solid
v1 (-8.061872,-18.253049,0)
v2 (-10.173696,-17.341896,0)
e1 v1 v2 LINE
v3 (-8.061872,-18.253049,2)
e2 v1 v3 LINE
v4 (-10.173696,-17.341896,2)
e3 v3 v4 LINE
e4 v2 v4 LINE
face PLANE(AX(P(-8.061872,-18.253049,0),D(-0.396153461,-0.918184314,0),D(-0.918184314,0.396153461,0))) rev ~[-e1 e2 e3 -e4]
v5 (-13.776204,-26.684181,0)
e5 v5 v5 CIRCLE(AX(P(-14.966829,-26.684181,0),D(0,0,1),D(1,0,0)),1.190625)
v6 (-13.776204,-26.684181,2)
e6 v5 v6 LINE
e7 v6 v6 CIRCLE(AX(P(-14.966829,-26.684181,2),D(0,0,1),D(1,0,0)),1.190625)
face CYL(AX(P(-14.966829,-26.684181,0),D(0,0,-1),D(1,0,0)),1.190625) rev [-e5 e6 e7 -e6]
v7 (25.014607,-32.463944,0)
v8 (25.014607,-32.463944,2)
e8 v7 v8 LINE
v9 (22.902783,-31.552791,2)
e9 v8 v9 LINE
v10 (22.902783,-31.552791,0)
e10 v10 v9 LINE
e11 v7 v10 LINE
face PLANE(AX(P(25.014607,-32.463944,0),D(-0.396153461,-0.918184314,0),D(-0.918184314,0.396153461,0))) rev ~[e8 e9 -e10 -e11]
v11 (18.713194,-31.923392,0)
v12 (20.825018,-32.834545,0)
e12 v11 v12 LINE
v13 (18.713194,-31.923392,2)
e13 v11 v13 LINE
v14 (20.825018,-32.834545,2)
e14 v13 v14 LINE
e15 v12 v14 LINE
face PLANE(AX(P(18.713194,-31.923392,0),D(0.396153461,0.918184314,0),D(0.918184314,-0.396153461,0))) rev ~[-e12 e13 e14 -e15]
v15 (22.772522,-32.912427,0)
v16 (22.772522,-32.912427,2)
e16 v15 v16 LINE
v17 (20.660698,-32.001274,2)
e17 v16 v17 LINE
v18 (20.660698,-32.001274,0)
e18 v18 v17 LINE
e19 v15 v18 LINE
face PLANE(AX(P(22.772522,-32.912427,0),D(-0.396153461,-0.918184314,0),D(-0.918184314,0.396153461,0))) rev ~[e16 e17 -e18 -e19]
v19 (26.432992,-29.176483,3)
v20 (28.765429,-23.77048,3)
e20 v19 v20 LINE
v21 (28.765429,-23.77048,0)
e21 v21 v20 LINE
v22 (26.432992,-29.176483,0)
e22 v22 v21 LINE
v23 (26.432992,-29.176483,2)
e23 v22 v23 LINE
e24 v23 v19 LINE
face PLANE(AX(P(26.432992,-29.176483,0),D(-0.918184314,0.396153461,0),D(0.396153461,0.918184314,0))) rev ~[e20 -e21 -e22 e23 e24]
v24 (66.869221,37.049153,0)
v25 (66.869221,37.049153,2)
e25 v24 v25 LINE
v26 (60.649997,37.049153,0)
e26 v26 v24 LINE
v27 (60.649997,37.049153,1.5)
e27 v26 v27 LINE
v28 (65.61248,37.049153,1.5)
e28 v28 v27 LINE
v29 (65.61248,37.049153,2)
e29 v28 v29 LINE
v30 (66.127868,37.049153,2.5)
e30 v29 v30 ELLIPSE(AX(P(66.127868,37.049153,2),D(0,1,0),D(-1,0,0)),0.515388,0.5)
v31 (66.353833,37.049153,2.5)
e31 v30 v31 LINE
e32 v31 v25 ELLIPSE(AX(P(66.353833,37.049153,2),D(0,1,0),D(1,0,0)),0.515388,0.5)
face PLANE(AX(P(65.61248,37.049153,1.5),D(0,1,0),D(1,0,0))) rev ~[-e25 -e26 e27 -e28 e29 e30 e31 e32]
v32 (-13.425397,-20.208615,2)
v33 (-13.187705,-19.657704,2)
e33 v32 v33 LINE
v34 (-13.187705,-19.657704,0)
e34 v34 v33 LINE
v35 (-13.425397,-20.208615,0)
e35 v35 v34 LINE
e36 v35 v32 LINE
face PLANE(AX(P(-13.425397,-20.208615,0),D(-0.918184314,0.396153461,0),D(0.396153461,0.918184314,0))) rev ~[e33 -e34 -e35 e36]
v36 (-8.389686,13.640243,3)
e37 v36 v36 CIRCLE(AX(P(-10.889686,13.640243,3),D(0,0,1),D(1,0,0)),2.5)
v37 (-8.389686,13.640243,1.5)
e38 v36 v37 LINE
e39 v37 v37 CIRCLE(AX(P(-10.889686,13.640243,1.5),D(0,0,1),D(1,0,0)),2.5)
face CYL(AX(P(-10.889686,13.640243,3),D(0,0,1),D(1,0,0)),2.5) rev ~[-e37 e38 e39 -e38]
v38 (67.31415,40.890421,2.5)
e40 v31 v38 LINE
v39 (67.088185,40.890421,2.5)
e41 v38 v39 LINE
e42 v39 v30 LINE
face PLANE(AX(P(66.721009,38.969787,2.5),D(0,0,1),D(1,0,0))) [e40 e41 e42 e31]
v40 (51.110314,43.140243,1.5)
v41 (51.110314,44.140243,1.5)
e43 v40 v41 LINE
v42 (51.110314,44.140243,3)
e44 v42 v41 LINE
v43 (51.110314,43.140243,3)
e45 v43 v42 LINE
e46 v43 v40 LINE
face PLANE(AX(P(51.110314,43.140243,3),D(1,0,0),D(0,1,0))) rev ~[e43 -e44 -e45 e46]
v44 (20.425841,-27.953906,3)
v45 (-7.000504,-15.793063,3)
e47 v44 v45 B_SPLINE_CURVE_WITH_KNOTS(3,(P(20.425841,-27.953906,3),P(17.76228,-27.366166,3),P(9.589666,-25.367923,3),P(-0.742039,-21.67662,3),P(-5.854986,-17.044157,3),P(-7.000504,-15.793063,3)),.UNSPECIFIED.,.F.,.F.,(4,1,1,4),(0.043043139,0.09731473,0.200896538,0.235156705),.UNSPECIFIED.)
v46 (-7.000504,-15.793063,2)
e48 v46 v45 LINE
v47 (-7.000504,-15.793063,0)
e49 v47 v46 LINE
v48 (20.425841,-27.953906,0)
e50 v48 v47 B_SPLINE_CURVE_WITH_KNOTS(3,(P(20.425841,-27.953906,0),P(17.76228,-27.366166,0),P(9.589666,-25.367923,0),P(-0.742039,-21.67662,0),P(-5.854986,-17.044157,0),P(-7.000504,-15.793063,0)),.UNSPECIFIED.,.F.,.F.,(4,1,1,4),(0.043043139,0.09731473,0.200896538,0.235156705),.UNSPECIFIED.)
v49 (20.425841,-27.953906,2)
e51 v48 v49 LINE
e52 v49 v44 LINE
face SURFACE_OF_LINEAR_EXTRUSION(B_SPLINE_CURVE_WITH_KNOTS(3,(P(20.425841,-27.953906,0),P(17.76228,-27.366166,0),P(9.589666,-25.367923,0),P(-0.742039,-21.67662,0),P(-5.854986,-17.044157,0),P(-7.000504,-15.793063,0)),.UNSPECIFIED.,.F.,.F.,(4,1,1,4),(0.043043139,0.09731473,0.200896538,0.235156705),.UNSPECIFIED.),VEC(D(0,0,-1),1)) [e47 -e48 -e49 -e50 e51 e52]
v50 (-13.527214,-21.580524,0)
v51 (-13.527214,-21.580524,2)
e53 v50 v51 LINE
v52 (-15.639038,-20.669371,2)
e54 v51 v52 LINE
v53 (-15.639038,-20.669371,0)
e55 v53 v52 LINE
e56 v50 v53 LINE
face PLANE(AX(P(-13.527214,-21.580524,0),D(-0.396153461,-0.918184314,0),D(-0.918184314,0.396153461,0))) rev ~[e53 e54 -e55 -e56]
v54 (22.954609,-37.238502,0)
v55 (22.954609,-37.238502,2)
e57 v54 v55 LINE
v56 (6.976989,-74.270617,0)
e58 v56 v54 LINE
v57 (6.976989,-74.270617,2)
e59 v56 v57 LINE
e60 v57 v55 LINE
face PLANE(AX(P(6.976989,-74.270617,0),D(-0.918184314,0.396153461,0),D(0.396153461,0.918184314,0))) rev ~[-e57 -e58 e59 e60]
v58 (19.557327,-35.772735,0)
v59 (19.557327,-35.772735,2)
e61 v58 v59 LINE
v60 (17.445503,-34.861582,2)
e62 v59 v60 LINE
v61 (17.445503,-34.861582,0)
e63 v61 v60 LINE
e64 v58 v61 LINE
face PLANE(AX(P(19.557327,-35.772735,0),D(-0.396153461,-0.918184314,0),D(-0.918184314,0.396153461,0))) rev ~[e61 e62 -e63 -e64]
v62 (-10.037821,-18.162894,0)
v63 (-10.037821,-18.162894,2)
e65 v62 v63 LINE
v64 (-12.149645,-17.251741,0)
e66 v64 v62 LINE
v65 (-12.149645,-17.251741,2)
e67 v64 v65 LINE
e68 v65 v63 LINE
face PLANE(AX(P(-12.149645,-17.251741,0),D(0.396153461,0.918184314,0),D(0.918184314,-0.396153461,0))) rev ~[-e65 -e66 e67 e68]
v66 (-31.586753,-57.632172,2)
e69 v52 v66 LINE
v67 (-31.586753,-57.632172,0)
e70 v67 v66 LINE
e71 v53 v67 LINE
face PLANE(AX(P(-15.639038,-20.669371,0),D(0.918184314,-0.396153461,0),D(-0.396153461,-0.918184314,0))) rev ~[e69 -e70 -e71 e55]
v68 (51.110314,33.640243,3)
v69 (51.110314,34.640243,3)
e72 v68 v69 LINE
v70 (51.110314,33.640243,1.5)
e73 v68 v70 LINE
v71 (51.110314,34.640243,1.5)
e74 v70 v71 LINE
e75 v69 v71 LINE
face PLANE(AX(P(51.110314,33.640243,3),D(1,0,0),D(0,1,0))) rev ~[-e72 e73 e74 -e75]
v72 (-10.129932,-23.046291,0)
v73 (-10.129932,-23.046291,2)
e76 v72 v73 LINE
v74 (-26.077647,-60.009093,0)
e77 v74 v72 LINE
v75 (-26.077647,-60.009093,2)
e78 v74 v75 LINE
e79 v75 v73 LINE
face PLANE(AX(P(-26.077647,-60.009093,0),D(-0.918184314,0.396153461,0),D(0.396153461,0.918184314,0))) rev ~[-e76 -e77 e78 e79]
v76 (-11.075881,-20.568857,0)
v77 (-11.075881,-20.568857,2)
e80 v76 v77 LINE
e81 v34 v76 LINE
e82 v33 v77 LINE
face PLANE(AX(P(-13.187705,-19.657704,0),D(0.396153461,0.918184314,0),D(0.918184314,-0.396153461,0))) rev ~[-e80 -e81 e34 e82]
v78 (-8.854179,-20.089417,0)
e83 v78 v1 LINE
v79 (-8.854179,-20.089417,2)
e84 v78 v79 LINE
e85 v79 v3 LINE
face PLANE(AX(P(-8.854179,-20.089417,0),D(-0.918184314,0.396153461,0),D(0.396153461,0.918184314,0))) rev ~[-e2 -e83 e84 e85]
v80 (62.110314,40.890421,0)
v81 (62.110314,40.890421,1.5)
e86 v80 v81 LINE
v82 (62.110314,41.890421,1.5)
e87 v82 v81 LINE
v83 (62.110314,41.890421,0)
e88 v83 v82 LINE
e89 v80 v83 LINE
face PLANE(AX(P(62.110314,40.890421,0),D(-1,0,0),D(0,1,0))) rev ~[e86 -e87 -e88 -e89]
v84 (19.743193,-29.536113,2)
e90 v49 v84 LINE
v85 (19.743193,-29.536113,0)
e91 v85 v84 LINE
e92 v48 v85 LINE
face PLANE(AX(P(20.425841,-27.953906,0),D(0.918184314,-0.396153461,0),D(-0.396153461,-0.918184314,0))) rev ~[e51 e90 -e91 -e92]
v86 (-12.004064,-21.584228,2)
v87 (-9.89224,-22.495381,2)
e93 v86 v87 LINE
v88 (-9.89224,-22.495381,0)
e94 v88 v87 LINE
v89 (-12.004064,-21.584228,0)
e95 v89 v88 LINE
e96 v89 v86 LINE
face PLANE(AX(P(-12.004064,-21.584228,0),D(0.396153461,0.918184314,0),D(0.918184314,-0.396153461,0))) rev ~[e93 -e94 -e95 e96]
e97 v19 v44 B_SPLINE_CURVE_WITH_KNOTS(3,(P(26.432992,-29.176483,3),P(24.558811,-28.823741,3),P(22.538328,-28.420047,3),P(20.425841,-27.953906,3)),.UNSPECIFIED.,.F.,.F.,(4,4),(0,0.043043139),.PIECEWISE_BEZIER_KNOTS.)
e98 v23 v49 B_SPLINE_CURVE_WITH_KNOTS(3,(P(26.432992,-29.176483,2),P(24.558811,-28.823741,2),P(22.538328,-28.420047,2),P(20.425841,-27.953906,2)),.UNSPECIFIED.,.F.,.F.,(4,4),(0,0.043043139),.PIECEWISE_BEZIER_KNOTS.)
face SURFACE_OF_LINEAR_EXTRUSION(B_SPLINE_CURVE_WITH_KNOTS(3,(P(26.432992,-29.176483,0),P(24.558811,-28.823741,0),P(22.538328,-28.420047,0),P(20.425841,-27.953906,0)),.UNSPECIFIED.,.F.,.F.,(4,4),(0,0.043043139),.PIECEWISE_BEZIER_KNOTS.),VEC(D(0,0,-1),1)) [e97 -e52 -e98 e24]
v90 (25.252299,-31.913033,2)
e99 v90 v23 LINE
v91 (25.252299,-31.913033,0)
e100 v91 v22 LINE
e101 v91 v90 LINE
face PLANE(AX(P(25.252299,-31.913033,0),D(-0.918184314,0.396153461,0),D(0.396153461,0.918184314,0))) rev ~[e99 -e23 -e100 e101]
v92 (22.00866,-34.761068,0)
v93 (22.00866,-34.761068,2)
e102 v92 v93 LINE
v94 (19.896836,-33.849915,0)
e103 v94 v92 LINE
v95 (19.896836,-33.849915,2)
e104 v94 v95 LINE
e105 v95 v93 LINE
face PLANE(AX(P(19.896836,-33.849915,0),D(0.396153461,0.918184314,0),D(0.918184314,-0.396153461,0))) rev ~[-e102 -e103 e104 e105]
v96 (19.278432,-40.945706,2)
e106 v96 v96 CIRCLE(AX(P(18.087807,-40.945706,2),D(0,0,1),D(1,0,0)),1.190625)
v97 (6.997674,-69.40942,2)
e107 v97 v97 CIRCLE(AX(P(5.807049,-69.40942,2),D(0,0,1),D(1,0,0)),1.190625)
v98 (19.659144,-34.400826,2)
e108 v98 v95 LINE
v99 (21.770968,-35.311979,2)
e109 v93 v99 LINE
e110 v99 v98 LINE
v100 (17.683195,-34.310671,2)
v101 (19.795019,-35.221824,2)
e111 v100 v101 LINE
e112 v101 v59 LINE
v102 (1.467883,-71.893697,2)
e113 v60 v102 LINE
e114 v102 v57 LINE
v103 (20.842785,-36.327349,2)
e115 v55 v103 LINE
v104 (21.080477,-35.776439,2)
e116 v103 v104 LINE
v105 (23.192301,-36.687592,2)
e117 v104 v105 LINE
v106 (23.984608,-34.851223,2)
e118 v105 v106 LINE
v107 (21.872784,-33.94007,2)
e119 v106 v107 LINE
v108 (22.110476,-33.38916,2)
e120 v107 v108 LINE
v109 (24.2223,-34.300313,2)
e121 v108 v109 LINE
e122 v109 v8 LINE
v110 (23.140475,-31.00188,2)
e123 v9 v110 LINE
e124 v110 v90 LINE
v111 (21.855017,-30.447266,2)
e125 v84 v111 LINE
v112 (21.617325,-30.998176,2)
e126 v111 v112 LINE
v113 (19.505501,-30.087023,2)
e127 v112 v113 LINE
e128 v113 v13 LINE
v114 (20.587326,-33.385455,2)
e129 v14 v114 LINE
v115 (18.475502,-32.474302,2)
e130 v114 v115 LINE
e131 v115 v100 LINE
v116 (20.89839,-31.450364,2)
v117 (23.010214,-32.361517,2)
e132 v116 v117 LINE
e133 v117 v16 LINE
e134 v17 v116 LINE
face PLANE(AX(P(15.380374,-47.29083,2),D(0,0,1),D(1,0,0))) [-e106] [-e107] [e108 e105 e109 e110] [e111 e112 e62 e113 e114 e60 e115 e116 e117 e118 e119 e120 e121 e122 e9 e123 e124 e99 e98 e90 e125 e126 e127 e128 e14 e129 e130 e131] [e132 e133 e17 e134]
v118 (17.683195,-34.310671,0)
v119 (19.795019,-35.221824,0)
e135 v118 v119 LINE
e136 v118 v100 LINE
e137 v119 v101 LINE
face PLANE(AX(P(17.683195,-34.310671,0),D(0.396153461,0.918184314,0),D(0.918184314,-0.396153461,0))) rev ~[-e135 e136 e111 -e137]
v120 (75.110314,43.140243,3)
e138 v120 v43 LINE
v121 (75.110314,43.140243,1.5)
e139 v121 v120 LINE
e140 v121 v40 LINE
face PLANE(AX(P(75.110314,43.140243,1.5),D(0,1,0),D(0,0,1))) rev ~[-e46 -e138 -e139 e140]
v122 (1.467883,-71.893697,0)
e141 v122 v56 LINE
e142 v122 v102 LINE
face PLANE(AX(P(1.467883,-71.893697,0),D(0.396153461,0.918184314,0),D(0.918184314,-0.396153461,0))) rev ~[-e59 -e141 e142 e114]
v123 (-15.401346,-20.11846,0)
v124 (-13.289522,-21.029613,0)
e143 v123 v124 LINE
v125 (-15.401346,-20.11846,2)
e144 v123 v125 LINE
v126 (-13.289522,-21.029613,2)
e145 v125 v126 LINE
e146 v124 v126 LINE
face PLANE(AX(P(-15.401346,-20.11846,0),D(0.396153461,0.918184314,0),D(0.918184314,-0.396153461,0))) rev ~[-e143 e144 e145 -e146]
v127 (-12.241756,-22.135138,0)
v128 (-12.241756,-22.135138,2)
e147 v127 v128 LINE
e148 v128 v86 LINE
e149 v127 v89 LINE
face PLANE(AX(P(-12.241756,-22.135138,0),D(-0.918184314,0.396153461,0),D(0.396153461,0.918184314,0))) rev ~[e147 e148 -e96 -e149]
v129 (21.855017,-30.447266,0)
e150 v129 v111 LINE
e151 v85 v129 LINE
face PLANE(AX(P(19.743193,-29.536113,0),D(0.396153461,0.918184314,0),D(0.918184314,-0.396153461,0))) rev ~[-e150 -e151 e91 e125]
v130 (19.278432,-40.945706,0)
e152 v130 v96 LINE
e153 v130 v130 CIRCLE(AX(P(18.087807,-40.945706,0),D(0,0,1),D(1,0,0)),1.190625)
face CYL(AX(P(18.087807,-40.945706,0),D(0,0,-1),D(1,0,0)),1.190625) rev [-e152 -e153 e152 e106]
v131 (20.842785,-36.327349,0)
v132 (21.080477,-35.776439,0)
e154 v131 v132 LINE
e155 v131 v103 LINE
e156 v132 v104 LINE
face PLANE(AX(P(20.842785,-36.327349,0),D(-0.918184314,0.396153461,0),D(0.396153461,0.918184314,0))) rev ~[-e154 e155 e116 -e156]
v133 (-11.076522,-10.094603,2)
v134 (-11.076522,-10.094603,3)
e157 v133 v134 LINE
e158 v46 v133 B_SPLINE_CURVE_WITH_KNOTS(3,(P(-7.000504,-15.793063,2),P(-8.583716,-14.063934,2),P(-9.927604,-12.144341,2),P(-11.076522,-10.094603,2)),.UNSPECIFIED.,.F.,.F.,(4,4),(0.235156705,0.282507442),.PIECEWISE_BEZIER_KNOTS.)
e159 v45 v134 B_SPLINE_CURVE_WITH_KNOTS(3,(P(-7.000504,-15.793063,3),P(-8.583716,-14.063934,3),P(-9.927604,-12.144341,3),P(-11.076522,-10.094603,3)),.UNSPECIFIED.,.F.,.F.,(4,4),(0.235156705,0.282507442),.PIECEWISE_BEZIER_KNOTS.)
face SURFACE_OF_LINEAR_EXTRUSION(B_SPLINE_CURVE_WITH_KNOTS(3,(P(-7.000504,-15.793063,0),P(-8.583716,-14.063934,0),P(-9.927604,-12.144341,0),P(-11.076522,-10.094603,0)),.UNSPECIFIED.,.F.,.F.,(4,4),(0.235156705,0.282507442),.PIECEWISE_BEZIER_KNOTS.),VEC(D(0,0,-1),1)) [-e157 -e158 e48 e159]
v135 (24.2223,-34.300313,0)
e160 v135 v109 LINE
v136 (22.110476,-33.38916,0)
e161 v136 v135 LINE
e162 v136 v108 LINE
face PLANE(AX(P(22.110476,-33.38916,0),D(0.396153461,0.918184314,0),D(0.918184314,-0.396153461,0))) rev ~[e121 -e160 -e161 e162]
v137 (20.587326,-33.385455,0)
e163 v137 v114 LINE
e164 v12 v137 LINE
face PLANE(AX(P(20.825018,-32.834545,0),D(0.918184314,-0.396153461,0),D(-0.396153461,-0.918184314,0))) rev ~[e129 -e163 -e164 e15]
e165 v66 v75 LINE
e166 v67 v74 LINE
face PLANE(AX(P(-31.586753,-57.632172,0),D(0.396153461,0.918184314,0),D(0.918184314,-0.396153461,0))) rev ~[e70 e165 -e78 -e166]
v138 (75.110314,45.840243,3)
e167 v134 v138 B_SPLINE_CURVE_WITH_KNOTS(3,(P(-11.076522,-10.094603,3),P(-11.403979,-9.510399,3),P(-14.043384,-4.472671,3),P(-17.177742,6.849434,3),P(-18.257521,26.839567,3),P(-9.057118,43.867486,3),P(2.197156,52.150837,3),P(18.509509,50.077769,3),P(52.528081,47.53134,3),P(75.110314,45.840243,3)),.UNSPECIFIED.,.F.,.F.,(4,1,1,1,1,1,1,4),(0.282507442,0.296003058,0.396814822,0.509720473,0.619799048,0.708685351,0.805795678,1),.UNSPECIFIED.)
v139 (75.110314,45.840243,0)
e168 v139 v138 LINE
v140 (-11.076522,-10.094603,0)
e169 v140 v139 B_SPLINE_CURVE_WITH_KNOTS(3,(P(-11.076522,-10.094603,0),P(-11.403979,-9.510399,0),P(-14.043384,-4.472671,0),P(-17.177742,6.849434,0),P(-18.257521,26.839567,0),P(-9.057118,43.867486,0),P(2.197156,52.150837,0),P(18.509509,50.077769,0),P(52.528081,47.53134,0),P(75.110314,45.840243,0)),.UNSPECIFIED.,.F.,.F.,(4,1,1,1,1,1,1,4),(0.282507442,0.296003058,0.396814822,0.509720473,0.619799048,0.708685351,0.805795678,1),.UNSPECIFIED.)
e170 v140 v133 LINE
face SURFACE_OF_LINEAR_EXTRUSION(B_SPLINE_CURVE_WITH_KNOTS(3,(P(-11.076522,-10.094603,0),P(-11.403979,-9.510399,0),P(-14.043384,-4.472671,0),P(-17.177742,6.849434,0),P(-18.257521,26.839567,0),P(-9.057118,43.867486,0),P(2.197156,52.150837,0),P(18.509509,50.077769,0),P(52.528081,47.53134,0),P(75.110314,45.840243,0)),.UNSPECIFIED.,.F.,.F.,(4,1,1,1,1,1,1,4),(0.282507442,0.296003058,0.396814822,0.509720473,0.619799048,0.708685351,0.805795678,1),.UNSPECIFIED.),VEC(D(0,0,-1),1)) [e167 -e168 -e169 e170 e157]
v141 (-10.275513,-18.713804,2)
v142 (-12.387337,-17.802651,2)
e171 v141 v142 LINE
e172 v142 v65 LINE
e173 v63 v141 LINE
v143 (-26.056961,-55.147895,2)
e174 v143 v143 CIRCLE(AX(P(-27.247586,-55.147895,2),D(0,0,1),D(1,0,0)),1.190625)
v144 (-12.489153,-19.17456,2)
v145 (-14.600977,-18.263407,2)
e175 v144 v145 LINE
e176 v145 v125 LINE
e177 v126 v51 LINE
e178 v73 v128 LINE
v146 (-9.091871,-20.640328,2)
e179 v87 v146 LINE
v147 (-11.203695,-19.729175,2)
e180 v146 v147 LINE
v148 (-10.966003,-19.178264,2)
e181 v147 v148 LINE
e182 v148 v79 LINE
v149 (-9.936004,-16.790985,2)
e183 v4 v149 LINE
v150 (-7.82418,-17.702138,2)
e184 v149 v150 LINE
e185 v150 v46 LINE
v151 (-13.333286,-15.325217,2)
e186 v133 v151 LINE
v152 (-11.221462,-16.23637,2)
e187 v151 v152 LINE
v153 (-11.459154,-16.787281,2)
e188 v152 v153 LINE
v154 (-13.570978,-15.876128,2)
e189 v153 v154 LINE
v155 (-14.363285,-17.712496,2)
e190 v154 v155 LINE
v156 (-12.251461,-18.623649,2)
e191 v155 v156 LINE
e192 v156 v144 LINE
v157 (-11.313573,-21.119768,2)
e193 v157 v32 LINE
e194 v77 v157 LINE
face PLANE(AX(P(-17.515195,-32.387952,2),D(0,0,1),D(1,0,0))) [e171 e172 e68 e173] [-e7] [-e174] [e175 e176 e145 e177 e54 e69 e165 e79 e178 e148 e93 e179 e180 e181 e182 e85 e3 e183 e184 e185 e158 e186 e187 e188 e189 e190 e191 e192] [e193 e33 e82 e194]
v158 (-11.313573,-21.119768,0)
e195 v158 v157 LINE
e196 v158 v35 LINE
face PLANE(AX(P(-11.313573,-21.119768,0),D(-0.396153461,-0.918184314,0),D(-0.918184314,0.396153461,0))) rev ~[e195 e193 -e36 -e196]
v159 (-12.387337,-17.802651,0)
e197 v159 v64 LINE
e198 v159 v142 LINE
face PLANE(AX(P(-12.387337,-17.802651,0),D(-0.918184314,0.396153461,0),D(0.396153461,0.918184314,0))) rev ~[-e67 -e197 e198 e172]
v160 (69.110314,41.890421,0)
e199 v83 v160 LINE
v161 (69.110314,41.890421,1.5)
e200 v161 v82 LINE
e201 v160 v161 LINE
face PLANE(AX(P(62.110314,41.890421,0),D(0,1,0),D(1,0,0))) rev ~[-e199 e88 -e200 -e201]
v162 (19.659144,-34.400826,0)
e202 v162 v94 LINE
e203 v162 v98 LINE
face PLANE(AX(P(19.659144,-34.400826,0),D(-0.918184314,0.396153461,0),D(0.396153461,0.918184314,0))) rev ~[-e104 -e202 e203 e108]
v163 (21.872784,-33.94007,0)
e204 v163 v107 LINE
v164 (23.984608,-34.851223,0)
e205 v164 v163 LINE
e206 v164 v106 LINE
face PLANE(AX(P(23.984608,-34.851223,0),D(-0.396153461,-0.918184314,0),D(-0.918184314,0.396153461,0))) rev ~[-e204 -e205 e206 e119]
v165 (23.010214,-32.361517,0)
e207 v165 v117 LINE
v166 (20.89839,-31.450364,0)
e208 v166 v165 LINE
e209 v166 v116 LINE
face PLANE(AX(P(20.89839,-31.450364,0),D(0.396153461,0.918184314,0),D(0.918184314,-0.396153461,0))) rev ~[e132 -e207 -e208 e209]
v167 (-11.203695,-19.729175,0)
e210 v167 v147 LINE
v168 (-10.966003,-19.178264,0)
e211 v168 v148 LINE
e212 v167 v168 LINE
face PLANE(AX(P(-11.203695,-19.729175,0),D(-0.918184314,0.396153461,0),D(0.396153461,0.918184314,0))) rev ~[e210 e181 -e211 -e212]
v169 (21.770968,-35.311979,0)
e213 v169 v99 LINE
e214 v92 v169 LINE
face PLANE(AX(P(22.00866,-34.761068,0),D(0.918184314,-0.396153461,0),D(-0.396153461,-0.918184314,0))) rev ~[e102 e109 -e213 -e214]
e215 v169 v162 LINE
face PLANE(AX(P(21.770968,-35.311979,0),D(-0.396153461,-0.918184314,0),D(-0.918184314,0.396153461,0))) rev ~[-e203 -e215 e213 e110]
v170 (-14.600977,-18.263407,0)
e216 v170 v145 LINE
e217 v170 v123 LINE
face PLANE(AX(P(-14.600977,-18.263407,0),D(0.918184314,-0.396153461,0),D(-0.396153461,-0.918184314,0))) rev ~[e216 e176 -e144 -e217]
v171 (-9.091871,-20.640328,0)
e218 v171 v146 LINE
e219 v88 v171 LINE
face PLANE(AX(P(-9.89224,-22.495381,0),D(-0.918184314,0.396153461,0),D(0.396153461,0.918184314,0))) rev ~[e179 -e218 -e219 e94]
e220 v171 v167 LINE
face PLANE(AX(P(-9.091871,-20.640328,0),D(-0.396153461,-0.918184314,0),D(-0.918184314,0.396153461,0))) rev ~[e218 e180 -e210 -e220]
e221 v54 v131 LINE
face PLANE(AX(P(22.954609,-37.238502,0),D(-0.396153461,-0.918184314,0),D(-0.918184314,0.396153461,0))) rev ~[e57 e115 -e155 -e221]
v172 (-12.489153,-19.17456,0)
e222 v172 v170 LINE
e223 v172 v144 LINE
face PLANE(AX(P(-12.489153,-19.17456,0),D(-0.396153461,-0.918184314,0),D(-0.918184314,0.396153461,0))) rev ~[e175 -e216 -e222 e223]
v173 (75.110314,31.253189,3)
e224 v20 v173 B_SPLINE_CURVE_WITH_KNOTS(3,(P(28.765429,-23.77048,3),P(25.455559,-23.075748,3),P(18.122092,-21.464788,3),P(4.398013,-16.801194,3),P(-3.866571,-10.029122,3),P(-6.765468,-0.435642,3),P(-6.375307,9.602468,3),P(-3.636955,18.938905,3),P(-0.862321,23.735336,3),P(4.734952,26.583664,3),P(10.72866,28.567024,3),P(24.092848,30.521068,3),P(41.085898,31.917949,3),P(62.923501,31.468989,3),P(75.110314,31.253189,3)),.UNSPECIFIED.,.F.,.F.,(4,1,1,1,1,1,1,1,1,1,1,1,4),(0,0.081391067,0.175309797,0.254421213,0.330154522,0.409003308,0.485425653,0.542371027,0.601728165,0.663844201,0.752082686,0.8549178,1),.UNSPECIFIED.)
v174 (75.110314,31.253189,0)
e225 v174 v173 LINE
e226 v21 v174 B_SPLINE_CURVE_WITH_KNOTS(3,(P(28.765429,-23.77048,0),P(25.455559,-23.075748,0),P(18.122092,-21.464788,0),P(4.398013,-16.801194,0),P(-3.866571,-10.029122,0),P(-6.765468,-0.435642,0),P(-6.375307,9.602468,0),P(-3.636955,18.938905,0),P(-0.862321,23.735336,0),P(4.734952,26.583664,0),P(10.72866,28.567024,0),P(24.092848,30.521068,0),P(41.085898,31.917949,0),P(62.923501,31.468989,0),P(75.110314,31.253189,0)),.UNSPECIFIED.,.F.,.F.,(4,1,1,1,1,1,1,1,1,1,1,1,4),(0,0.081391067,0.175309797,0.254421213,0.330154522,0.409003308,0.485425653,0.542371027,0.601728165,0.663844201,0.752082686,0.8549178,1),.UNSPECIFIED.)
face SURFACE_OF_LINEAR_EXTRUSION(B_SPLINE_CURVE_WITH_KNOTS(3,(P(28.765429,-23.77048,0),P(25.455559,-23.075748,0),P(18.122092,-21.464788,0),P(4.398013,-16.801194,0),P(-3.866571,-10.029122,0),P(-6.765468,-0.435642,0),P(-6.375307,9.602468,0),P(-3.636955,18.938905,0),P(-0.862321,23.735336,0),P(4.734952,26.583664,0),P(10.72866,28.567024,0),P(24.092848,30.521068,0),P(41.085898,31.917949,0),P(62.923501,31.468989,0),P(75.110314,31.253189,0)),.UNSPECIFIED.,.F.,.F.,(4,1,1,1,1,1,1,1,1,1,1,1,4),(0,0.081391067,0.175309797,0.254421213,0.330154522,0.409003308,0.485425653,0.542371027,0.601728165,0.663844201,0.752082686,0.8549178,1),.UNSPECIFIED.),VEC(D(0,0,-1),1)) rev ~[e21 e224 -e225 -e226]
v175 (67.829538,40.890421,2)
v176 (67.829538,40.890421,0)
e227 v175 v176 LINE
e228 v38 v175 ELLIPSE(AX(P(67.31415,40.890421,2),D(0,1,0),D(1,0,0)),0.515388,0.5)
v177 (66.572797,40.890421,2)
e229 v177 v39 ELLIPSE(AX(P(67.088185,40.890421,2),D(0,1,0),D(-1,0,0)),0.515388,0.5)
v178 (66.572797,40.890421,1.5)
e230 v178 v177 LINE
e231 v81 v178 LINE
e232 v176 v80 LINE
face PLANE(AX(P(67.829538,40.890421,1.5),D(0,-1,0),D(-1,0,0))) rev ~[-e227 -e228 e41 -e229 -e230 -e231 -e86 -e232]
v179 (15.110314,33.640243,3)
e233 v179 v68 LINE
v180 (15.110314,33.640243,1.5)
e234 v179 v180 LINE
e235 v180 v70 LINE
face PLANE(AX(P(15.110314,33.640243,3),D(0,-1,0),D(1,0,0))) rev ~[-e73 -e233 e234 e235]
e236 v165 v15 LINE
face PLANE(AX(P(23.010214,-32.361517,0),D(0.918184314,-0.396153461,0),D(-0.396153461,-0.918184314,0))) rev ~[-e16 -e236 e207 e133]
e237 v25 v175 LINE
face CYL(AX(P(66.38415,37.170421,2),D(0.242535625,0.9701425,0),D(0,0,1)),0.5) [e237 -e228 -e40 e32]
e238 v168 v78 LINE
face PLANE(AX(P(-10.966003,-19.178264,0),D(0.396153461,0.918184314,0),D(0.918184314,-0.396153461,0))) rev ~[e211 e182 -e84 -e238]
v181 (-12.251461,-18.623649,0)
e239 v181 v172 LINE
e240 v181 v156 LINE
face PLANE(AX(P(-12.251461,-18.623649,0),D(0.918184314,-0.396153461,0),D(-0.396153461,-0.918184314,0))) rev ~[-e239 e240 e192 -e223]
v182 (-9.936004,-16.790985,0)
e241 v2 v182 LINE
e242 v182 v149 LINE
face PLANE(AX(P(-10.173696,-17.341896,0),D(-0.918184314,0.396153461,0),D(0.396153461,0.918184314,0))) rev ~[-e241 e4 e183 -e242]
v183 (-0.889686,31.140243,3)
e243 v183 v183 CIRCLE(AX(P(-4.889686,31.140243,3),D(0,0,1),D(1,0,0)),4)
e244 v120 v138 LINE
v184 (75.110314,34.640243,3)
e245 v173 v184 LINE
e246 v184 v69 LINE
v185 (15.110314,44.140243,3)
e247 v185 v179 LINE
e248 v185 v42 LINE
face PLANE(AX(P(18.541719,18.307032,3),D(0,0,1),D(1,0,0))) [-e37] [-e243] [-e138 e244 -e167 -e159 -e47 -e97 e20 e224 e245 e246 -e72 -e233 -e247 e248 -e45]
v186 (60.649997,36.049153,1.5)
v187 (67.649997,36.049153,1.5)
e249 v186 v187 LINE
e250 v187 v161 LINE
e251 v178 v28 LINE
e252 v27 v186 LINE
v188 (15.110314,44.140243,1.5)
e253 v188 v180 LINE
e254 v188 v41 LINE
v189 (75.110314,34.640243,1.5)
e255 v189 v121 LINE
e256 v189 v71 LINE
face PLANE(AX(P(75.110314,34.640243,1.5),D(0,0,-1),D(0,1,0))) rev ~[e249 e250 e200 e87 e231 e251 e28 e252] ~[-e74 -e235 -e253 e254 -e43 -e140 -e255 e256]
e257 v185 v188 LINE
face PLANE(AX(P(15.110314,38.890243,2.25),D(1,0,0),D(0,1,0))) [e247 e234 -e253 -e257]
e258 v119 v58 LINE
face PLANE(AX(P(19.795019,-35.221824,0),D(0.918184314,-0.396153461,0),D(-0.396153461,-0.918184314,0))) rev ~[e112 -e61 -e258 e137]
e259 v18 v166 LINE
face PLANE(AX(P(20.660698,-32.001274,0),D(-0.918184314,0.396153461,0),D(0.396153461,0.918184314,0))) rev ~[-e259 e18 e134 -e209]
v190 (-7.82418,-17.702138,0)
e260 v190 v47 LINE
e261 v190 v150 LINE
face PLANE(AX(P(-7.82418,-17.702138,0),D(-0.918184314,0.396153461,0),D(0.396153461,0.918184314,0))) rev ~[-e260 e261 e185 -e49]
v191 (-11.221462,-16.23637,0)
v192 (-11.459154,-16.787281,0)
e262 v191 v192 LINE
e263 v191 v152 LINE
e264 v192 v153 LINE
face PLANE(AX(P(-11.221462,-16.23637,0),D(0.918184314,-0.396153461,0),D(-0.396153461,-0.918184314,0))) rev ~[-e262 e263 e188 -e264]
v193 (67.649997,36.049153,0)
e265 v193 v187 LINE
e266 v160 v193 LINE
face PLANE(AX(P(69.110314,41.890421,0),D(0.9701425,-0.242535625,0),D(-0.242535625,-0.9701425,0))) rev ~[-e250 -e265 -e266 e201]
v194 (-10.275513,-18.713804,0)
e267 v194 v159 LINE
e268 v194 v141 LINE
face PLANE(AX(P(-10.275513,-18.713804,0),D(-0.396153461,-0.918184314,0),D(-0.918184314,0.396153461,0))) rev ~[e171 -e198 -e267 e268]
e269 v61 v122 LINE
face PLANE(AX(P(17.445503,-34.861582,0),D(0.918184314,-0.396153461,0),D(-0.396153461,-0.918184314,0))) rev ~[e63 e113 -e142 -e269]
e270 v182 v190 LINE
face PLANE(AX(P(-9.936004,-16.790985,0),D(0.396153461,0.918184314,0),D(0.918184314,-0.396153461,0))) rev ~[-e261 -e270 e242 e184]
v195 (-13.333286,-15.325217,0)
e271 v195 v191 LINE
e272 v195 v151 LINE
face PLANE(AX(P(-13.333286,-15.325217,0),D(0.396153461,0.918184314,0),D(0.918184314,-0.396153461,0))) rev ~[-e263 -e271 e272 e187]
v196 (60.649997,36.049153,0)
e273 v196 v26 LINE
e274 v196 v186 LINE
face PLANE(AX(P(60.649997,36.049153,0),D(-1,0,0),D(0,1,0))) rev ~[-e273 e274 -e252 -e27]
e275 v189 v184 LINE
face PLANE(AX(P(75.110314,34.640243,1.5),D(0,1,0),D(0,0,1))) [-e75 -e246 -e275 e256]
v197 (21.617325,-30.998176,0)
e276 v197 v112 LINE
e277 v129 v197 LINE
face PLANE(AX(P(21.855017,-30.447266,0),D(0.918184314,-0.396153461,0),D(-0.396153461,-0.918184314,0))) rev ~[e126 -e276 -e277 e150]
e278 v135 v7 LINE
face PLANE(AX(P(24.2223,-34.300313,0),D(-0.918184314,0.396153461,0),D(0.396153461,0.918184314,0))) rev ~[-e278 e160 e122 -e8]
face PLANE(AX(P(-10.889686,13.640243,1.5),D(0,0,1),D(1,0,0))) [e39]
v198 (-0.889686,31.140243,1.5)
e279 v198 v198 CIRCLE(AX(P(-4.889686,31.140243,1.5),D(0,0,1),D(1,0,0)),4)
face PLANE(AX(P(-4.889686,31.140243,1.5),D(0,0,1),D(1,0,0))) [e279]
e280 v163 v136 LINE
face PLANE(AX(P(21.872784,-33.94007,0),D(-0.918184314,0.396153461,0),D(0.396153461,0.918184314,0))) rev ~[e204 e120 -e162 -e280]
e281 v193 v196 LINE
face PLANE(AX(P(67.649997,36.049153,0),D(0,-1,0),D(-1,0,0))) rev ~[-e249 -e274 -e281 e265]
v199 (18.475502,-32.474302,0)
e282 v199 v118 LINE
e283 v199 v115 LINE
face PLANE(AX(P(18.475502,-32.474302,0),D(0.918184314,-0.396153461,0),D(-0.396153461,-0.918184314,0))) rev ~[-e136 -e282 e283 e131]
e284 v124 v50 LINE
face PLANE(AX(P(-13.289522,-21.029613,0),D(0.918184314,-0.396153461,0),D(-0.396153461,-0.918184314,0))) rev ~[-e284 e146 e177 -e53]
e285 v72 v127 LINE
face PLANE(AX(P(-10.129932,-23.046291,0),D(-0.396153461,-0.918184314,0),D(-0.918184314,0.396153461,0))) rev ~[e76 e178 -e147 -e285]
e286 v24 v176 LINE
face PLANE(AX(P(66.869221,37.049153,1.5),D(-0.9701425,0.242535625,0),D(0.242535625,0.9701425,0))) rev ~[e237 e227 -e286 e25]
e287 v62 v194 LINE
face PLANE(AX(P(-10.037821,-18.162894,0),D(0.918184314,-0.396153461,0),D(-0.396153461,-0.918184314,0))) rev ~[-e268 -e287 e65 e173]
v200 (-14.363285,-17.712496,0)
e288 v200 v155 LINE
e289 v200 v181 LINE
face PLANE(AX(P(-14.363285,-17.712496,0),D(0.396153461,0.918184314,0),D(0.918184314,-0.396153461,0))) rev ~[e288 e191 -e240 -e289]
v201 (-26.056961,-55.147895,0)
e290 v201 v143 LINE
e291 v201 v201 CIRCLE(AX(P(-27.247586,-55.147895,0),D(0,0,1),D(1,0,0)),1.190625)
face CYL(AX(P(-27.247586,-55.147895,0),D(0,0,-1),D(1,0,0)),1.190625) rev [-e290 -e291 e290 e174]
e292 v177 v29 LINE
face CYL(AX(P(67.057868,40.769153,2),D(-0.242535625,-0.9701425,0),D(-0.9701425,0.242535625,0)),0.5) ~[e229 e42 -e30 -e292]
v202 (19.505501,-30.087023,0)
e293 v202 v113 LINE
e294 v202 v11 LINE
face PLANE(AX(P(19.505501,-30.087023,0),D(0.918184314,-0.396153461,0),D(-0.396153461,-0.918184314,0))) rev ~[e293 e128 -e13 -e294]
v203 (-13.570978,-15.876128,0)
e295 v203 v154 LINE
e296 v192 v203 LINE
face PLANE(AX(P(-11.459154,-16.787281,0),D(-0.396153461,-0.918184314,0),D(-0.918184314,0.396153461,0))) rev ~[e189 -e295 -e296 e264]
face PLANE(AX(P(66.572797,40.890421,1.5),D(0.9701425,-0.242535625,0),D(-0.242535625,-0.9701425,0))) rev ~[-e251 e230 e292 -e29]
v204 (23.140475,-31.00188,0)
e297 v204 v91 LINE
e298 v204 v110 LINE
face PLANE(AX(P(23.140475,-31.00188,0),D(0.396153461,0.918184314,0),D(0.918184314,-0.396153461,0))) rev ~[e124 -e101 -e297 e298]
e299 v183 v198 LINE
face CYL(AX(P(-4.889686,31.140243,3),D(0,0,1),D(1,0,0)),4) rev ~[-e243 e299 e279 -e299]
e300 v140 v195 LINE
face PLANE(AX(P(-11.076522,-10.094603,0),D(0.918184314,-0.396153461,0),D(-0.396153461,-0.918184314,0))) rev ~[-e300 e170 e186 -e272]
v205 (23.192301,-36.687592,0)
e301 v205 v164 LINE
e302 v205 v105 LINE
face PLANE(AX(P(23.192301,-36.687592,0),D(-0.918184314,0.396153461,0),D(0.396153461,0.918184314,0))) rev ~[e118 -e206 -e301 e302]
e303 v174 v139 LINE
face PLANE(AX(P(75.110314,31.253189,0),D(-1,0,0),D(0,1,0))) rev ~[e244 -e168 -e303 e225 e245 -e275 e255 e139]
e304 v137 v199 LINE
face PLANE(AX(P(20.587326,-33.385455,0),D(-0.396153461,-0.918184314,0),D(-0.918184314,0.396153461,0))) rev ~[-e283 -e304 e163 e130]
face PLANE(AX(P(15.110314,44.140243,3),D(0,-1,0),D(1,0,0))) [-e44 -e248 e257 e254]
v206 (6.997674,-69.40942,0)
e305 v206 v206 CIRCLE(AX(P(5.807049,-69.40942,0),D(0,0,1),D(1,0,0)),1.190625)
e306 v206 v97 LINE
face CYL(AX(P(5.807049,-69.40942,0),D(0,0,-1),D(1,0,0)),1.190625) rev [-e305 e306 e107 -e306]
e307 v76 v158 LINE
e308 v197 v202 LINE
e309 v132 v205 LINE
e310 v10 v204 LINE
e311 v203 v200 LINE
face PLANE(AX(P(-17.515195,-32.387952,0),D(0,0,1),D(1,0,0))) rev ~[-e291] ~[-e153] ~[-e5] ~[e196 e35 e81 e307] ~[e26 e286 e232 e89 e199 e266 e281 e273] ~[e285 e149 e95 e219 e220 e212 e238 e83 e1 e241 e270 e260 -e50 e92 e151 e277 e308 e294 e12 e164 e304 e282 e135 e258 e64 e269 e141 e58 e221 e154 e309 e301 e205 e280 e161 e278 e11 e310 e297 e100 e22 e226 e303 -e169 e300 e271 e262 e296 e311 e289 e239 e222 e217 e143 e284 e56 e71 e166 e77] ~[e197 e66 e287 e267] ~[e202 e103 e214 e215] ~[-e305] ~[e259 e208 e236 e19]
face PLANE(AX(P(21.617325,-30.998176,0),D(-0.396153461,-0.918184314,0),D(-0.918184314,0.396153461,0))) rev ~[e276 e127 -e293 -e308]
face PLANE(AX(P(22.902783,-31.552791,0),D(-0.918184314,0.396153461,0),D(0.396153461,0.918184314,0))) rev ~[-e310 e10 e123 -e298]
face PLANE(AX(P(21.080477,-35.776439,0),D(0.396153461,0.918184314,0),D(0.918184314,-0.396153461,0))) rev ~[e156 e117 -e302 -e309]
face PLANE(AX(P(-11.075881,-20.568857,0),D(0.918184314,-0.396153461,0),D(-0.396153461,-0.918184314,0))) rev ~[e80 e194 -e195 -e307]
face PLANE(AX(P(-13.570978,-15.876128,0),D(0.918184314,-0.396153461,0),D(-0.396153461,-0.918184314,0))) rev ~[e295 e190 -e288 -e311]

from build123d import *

# Parameters (mm, degrees)
F1_DEPTH = 3
F2_W     = 8.5
F2_H     = 1.5
F3_DEPTH = 60
F0_R     = 1.190625
F4_DEPTH = 2
F6_DEPTH = 1
F7_R     = 0.5
F8_W     = 36
F8_H     = 1
F8_R     = 4
F8_R_2   = 2.5
F9_DEPTH = 1.5


with BuildPart() as f1:
    # F0 (on Top) → F1 (new body)
    with BuildSketch(Plane.XY):
        with BuildLine():
            Line((26.4329920983, -29.1764834751), (28.7654289259, -23.7704801999))
            add(Edge.make_bspline(
                [(28.7654289259, -23.7704801999), (25.4555594803, -23.0757479442), (18.122091552, -21.4647883009), (4.3980129119, -16.8011940655), (-3.8665706509, -10.0291223028), (-6.7654679647, -0.4356418155), (-6.3753072829, 9.6024678508), (-3.6369552871, 18.9389051335), (-0.8623211451, 23.7353358816), (4.7349516236, 26.5836641266), (10.7286597258, 28.5670237026), (24.0928479086, 30.5210675073), (41.0858980443, 31.9179492856), (62.923501486, 31.4689886818), (75.1103142806, 31.2531887853)],
                knots=[0, 0, 0, 0, 0.081391067, 0.1753097966, 0.2544212132, 0.3301545218, 0.4090033083, 0.485425653, 0.5423710265, 0.6017281651, 0.6638442011, 0.7520826863, 0.8549178005, 1, 1, 1, 1], degree=3))
            Line((75.1103142806, 31.2531887853), (75.1103142806, 45.8402432411))
            add(Edge.make_bspline(
                [(-11.0765215286, -10.0946031237), (-11.4039789468, -9.5103994177), (-14.0433837385, -4.4726707186), (-17.1777421826, 6.8494336444), (-18.2575205417, 26.8395665887), (-9.0571179008, 43.867485681), (2.1971560219, 52.1508367912), (18.5095094509, 50.0777693112), (52.5280811409, 47.5313397047), (75.1103142806, 45.8402432411)],
                knots=[0.2825074418, 0.2825074418, 0.2825074418, 0.2825074418, 0.2960030581, 0.3968148217, 0.5097204734, 0.6197990481, 0.7086853513, 0.8057956779, 1, 1, 1, 1], degree=3))
            add(Edge.make_bspline(
                [(-7.0005038153, -15.7930626635), (-8.5837156837, -14.0639344868), (-9.927604005, -12.1443410066), (-11.0765215286, -10.0946031237)],
                knots=[0.2351567051, 0.2351567051, 0.2351567051, 0.2351567051, 0.2825074418, 0.2825074418, 0.2825074418, 0.2825074418], degree=3))
            add(Edge.make_bspline(
                [(20.4258410741, -27.9539063604), (17.7622799682, -27.3661660643), (9.5896661153, -25.3679227855), (-0.7420393691, -21.6766195538), (-5.8549862066, -17.0441566035), (-7.0005038153, -15.7930626635)],
                knots=[0.0430431389, 0.0430431389, 0.0430431389, 0.0430431389, 0.0973147298, 0.2008965382, 0.2351567051, 0.2351567051, 0.2351567051, 0.2351567051], degree=3))
            add(Edge.make_bspline(
                [(26.4329920983, -29.1764834751), (24.5588112261, -28.8237411027), (22.5383280813, -28.4200468729), (20.4258410741, -27.9539063604)],
                knots=[0, 0, 0, 0, 0.0430431389, 0.0430431389, 0.0430431389, 0.0430431389], degree=3))
        make_face()
        Polygon((60.6499973609, 37.0491529702), (66.8692209545, 37.0491529702), (67.8295378742, 40.8904206488), (62.1103142806, 40.8904206488), (62.1103142806, 41.8904206488), (69.1103142806, 41.8904206488), (67.6499973609, 36.0491529702), (60.6499973609, 36.0491529702), align=None, mode=Mode.SUBTRACT)
    extrude(amount=F1_DEPTH)

    # F2 (on face) → F3 (cut)
    with BuildSketch(Plane.YZ.offset(75.1103142806)):
        with Locations((38.8902432411, 2.25)):
            Rectangle(F2_W, F2_H)
    extrude(amount=-F3_DEPTH, mode=Mode.SUBTRACT)

    # F0 (on Top) → F4 (join)
    with BuildSketch(Plane.XY):
        with BuildLine():
            add(Edge.make_bspline(
                [(-7.0005038153, -15.7930626635), (-8.5837156837, -14.0639344868), (-9.927604005, -12.1443410066), (-11.0765215286, -10.0946031237)],
                knots=[0.2351567051, 0.2351567051, 0.2351567051, 0.2351567051, 0.2825074418, 0.2825074418, 0.2825074418, 0.2825074418], degree=3))
            Line((-11.0765215286, -10.0946031237), (-13.3332861786, -15.3252172802))
            Line((-13.3332861786, -15.3252172802), (-11.2214622556, -16.2363702412))
            Line((-11.2214622556, -16.2363702412), (-11.4591543324, -16.7872808298))
            Line((-11.4591543324, -16.7872808298), (-13.5709782553, -15.8761278688))
            Line((-13.5709782553, -15.8761278688), (-14.3632851779, -17.7124964975))
            Line((-14.3632851779, -17.7124964975), (-12.251461255, -18.6236494585))
            Line((-12.251461255, -18.6236494585), (-12.4891533317, -19.1745600471))
            Line((-12.4891533317, -19.1745600471), (-14.6009772547, -18.2634070861))
            Line((-14.6009772547, -18.2634070861), (-15.40134555, -20.1184599538))
            Line((-15.40134555, -20.1184599538), (-13.289521627, -21.0296129148))
            Line((-13.289521627, -21.0296129148), (-13.5272137038, -21.5805235034))
            Line((-13.5272137038, -21.5805235034), (-15.6390376268, -20.6693705424))
            Line((-15.6390376268, -20.6693705424), (-31.5867526479, -57.6321721141))
            Line((-31.5867526479, -57.6321721141), (-26.0776467619, -60.0090928819))
            Line((-26.0776467619, -60.0090928819), (-10.1299317407, -23.0462913102))
            Line((-10.1299317407, -23.0462913102), (-12.2417556637, -22.1351383492))
            Line((-12.2417556637, -22.1351383492), (-12.004063587, -21.5842277606))
            Line((-12.004063587, -21.5842277606), (-9.892239664, -22.4953807216))
            Line((-9.892239664, -22.4953807216), (-9.0918713687, -20.6403278539))
            Line((-9.0918713687, -20.6403278539), (-11.2036952917, -19.7291748929))
            Line((-11.2036952917, -19.7291748929), (-10.9660032149, -19.1782643043))
            Line((-10.9660032149, -19.1782643043), (-8.8541792919, -20.0894172653))
            Line((-8.8541792919, -20.0894172653), (-8.0618723693, -18.2530486366))
            Line((-8.0618723693, -18.2530486366), (-10.1736962923, -17.3418956756))
            Line((-10.1736962923, -17.3418956756), (-9.9360042155, -16.790985087))
            Line((-9.9360042155, -16.790985087), (-7.8241802925, -17.702138048))
            Line((-7.8241802925, -17.702138048), (-7.0005038153, -15.7930626635))
        make_face()
        with Locations((-27.2475858597, -55.1478952406)):
            Circle(F0_R, mode=Mode.SUBTRACT)
        with Locations((-14.9668285594, -26.6841814961)):
            Circle(F0_R, mode=Mode.SUBTRACT)
        Polygon((-13.4253971456, -20.2086148371), (-13.1877050688, -19.6577042485), (-11.0758811458, -20.5688572095), (-11.3135732226, -21.1197677981), align=None, mode=Mode.SUBTRACT)
        Polygon((-12.3873367735, -17.8026513809), (-12.1496446967, -17.2517407922), (-10.0378207737, -18.1628937532), (-10.2755128505, -18.7138043418), align=None, mode=Mode.SUBTRACT)
        with BuildLine():
            Line((25.2522991972, -31.9130333422), (26.4329920983, -29.1764834751))
            add(Edge.make_bspline(
                [(26.4329920983, -29.1764834751), (24.5588112261, -28.8237411027), (22.5383280813, -28.4200468729), (20.4258410741, -27.9539063604)],
                knots=[0, 0, 0, 0, 0.0430431389, 0.0430431389, 0.0430431389, 0.0430431389], degree=3))
            Line((20.4258410741, -27.9539063604), (19.7431933111, -29.5361125744))
            Line((19.7431933111, -29.5361125744), (21.8550172341, -30.4472655354))
            Line((21.8550172341, -30.4472655354), (21.6173251573, -30.998176124))
            Line((21.6173251573, -30.998176124), (19.5055012343, -30.087023163))
            Line((19.5055012343, -30.087023163), (18.7131943117, -31.9233917917))
            Line((18.7131943117, -31.9233917917), (20.8250182347, -32.8345447527))
            Line((20.8250182347, -32.8345447527), (20.5873261579, -33.3854553413))
            Line((20.5873261579, -33.3854553413), (18.475502235, -32.4743023803))
            Line((18.475502235, -32.4743023803), (17.6831953124, -34.310671009))
            Line((17.6831953124, -34.310671009), (19.7950192353, -35.22182397))
            Line((19.7950192353, -35.22182397), (19.5573271586, -35.7727345586))
            Line((19.5573271586, -35.7727345586), (17.4455032356, -34.8615815976))
            Line((17.4455032356, -34.8615815976), (1.4678826683, -71.8936967209))
            Line((1.4678826683, -71.8936967209), (6.9769885544, -74.2706174887))
            Line((6.9769885544, -74.2706174887), (22.9546091216, -37.2385023654))
            Line((22.9546091216, -37.2385023654), (20.8427851986, -36.3273494044))
            Line((20.8427851986, -36.3273494044), (21.0804772754, -35.7764388158))
            Line((21.0804772754, -35.7764388158), (23.1923011984, -36.6875917768))
            Line((23.1923011984, -36.6875917768), (23.984608121, -34.8512231481))
            Line((23.984608121, -34.8512231481), (21.872784198, -33.9400701871))
            Line((21.872784198, -33.9400701871), (22.1104762748, -33.3891595985))
            Line((22.1104762748, -33.3891595985), (24.2223001978, -34.3003125595))
            Line((24.2223001978, -34.3003125595), (25.0146071204, -32.4639439308))
            Line((25.0146071204, -32.4639439308), (22.9027831974, -31.5527909698))
            Line((22.9027831974, -31.5527909698), (23.1404752742, -31.0018803812))
            Line((23.1404752742, -31.0018803812), (25.2522991972, -31.9130333422))
        make_face()
        with Locations((5.8070494566, -69.4094198474)):
            Circle(F0_R, mode=Mode.SUBTRACT)
        with Locations((18.0878067568, -40.9457061029)):
            Circle(F0_R, mode=Mode.SUBTRACT)
        Polygon((19.8968357936, -33.8499153038), (22.0086597166, -34.7610682647), (21.7709676398, -35.3119788533), (19.6591437168, -34.4008258924), align=None, mode=Mode.SUBTRACT)
        Polygon((20.6606983625, -32.0012742707), (20.8983904393, -31.4503636821), (23.0102143623, -32.3615166431), (22.7725222855, -32.9124272317), align=None, mode=Mode.SUBTRACT)
    extrude(amount=F4_DEPTH)

    # F5 (on face) → F6 (join)
    with BuildSketch(Plane.XY.offset(1.5)):
        Polygon((66.572796964, 40.8904206488), (65.6124800444, 37.0491529702), (66.8692209545, 37.0491529702), (67.8295378742, 40.8904206488), align=None)
    extrude(amount=F6_DEPTH)

    # F7
    f7_edges = [f1.edges().sort_by_distance(p)[0] for p in [
        (67.349379, 38.969787, 2.5),
        (66.092639, 38.969787, 2.5),
    ]]
    fillet(f7_edges, radius=F7_R)

    # F8 (on face) → F9 (cut)
    with BuildSketch(Plane.XY.offset(3)):
        with Locations((33.1103142806, 34.1402432411)):
            Rectangle(F8_W, F8_H)
        with Locations((33.1103142806, 43.6402432411)):
            Rectangle(F8_W, F8_H)
        with Locations((-4.8896857194, 31.1402432411)):
            Circle(F8_R)
        with Locations((-10.8896857194, 13.6402432411)):
            Circle(F8_R_2)
    extrude(amount=-F9_DEPTH, mode=Mode.SUBTRACT)


solid = f1.part
